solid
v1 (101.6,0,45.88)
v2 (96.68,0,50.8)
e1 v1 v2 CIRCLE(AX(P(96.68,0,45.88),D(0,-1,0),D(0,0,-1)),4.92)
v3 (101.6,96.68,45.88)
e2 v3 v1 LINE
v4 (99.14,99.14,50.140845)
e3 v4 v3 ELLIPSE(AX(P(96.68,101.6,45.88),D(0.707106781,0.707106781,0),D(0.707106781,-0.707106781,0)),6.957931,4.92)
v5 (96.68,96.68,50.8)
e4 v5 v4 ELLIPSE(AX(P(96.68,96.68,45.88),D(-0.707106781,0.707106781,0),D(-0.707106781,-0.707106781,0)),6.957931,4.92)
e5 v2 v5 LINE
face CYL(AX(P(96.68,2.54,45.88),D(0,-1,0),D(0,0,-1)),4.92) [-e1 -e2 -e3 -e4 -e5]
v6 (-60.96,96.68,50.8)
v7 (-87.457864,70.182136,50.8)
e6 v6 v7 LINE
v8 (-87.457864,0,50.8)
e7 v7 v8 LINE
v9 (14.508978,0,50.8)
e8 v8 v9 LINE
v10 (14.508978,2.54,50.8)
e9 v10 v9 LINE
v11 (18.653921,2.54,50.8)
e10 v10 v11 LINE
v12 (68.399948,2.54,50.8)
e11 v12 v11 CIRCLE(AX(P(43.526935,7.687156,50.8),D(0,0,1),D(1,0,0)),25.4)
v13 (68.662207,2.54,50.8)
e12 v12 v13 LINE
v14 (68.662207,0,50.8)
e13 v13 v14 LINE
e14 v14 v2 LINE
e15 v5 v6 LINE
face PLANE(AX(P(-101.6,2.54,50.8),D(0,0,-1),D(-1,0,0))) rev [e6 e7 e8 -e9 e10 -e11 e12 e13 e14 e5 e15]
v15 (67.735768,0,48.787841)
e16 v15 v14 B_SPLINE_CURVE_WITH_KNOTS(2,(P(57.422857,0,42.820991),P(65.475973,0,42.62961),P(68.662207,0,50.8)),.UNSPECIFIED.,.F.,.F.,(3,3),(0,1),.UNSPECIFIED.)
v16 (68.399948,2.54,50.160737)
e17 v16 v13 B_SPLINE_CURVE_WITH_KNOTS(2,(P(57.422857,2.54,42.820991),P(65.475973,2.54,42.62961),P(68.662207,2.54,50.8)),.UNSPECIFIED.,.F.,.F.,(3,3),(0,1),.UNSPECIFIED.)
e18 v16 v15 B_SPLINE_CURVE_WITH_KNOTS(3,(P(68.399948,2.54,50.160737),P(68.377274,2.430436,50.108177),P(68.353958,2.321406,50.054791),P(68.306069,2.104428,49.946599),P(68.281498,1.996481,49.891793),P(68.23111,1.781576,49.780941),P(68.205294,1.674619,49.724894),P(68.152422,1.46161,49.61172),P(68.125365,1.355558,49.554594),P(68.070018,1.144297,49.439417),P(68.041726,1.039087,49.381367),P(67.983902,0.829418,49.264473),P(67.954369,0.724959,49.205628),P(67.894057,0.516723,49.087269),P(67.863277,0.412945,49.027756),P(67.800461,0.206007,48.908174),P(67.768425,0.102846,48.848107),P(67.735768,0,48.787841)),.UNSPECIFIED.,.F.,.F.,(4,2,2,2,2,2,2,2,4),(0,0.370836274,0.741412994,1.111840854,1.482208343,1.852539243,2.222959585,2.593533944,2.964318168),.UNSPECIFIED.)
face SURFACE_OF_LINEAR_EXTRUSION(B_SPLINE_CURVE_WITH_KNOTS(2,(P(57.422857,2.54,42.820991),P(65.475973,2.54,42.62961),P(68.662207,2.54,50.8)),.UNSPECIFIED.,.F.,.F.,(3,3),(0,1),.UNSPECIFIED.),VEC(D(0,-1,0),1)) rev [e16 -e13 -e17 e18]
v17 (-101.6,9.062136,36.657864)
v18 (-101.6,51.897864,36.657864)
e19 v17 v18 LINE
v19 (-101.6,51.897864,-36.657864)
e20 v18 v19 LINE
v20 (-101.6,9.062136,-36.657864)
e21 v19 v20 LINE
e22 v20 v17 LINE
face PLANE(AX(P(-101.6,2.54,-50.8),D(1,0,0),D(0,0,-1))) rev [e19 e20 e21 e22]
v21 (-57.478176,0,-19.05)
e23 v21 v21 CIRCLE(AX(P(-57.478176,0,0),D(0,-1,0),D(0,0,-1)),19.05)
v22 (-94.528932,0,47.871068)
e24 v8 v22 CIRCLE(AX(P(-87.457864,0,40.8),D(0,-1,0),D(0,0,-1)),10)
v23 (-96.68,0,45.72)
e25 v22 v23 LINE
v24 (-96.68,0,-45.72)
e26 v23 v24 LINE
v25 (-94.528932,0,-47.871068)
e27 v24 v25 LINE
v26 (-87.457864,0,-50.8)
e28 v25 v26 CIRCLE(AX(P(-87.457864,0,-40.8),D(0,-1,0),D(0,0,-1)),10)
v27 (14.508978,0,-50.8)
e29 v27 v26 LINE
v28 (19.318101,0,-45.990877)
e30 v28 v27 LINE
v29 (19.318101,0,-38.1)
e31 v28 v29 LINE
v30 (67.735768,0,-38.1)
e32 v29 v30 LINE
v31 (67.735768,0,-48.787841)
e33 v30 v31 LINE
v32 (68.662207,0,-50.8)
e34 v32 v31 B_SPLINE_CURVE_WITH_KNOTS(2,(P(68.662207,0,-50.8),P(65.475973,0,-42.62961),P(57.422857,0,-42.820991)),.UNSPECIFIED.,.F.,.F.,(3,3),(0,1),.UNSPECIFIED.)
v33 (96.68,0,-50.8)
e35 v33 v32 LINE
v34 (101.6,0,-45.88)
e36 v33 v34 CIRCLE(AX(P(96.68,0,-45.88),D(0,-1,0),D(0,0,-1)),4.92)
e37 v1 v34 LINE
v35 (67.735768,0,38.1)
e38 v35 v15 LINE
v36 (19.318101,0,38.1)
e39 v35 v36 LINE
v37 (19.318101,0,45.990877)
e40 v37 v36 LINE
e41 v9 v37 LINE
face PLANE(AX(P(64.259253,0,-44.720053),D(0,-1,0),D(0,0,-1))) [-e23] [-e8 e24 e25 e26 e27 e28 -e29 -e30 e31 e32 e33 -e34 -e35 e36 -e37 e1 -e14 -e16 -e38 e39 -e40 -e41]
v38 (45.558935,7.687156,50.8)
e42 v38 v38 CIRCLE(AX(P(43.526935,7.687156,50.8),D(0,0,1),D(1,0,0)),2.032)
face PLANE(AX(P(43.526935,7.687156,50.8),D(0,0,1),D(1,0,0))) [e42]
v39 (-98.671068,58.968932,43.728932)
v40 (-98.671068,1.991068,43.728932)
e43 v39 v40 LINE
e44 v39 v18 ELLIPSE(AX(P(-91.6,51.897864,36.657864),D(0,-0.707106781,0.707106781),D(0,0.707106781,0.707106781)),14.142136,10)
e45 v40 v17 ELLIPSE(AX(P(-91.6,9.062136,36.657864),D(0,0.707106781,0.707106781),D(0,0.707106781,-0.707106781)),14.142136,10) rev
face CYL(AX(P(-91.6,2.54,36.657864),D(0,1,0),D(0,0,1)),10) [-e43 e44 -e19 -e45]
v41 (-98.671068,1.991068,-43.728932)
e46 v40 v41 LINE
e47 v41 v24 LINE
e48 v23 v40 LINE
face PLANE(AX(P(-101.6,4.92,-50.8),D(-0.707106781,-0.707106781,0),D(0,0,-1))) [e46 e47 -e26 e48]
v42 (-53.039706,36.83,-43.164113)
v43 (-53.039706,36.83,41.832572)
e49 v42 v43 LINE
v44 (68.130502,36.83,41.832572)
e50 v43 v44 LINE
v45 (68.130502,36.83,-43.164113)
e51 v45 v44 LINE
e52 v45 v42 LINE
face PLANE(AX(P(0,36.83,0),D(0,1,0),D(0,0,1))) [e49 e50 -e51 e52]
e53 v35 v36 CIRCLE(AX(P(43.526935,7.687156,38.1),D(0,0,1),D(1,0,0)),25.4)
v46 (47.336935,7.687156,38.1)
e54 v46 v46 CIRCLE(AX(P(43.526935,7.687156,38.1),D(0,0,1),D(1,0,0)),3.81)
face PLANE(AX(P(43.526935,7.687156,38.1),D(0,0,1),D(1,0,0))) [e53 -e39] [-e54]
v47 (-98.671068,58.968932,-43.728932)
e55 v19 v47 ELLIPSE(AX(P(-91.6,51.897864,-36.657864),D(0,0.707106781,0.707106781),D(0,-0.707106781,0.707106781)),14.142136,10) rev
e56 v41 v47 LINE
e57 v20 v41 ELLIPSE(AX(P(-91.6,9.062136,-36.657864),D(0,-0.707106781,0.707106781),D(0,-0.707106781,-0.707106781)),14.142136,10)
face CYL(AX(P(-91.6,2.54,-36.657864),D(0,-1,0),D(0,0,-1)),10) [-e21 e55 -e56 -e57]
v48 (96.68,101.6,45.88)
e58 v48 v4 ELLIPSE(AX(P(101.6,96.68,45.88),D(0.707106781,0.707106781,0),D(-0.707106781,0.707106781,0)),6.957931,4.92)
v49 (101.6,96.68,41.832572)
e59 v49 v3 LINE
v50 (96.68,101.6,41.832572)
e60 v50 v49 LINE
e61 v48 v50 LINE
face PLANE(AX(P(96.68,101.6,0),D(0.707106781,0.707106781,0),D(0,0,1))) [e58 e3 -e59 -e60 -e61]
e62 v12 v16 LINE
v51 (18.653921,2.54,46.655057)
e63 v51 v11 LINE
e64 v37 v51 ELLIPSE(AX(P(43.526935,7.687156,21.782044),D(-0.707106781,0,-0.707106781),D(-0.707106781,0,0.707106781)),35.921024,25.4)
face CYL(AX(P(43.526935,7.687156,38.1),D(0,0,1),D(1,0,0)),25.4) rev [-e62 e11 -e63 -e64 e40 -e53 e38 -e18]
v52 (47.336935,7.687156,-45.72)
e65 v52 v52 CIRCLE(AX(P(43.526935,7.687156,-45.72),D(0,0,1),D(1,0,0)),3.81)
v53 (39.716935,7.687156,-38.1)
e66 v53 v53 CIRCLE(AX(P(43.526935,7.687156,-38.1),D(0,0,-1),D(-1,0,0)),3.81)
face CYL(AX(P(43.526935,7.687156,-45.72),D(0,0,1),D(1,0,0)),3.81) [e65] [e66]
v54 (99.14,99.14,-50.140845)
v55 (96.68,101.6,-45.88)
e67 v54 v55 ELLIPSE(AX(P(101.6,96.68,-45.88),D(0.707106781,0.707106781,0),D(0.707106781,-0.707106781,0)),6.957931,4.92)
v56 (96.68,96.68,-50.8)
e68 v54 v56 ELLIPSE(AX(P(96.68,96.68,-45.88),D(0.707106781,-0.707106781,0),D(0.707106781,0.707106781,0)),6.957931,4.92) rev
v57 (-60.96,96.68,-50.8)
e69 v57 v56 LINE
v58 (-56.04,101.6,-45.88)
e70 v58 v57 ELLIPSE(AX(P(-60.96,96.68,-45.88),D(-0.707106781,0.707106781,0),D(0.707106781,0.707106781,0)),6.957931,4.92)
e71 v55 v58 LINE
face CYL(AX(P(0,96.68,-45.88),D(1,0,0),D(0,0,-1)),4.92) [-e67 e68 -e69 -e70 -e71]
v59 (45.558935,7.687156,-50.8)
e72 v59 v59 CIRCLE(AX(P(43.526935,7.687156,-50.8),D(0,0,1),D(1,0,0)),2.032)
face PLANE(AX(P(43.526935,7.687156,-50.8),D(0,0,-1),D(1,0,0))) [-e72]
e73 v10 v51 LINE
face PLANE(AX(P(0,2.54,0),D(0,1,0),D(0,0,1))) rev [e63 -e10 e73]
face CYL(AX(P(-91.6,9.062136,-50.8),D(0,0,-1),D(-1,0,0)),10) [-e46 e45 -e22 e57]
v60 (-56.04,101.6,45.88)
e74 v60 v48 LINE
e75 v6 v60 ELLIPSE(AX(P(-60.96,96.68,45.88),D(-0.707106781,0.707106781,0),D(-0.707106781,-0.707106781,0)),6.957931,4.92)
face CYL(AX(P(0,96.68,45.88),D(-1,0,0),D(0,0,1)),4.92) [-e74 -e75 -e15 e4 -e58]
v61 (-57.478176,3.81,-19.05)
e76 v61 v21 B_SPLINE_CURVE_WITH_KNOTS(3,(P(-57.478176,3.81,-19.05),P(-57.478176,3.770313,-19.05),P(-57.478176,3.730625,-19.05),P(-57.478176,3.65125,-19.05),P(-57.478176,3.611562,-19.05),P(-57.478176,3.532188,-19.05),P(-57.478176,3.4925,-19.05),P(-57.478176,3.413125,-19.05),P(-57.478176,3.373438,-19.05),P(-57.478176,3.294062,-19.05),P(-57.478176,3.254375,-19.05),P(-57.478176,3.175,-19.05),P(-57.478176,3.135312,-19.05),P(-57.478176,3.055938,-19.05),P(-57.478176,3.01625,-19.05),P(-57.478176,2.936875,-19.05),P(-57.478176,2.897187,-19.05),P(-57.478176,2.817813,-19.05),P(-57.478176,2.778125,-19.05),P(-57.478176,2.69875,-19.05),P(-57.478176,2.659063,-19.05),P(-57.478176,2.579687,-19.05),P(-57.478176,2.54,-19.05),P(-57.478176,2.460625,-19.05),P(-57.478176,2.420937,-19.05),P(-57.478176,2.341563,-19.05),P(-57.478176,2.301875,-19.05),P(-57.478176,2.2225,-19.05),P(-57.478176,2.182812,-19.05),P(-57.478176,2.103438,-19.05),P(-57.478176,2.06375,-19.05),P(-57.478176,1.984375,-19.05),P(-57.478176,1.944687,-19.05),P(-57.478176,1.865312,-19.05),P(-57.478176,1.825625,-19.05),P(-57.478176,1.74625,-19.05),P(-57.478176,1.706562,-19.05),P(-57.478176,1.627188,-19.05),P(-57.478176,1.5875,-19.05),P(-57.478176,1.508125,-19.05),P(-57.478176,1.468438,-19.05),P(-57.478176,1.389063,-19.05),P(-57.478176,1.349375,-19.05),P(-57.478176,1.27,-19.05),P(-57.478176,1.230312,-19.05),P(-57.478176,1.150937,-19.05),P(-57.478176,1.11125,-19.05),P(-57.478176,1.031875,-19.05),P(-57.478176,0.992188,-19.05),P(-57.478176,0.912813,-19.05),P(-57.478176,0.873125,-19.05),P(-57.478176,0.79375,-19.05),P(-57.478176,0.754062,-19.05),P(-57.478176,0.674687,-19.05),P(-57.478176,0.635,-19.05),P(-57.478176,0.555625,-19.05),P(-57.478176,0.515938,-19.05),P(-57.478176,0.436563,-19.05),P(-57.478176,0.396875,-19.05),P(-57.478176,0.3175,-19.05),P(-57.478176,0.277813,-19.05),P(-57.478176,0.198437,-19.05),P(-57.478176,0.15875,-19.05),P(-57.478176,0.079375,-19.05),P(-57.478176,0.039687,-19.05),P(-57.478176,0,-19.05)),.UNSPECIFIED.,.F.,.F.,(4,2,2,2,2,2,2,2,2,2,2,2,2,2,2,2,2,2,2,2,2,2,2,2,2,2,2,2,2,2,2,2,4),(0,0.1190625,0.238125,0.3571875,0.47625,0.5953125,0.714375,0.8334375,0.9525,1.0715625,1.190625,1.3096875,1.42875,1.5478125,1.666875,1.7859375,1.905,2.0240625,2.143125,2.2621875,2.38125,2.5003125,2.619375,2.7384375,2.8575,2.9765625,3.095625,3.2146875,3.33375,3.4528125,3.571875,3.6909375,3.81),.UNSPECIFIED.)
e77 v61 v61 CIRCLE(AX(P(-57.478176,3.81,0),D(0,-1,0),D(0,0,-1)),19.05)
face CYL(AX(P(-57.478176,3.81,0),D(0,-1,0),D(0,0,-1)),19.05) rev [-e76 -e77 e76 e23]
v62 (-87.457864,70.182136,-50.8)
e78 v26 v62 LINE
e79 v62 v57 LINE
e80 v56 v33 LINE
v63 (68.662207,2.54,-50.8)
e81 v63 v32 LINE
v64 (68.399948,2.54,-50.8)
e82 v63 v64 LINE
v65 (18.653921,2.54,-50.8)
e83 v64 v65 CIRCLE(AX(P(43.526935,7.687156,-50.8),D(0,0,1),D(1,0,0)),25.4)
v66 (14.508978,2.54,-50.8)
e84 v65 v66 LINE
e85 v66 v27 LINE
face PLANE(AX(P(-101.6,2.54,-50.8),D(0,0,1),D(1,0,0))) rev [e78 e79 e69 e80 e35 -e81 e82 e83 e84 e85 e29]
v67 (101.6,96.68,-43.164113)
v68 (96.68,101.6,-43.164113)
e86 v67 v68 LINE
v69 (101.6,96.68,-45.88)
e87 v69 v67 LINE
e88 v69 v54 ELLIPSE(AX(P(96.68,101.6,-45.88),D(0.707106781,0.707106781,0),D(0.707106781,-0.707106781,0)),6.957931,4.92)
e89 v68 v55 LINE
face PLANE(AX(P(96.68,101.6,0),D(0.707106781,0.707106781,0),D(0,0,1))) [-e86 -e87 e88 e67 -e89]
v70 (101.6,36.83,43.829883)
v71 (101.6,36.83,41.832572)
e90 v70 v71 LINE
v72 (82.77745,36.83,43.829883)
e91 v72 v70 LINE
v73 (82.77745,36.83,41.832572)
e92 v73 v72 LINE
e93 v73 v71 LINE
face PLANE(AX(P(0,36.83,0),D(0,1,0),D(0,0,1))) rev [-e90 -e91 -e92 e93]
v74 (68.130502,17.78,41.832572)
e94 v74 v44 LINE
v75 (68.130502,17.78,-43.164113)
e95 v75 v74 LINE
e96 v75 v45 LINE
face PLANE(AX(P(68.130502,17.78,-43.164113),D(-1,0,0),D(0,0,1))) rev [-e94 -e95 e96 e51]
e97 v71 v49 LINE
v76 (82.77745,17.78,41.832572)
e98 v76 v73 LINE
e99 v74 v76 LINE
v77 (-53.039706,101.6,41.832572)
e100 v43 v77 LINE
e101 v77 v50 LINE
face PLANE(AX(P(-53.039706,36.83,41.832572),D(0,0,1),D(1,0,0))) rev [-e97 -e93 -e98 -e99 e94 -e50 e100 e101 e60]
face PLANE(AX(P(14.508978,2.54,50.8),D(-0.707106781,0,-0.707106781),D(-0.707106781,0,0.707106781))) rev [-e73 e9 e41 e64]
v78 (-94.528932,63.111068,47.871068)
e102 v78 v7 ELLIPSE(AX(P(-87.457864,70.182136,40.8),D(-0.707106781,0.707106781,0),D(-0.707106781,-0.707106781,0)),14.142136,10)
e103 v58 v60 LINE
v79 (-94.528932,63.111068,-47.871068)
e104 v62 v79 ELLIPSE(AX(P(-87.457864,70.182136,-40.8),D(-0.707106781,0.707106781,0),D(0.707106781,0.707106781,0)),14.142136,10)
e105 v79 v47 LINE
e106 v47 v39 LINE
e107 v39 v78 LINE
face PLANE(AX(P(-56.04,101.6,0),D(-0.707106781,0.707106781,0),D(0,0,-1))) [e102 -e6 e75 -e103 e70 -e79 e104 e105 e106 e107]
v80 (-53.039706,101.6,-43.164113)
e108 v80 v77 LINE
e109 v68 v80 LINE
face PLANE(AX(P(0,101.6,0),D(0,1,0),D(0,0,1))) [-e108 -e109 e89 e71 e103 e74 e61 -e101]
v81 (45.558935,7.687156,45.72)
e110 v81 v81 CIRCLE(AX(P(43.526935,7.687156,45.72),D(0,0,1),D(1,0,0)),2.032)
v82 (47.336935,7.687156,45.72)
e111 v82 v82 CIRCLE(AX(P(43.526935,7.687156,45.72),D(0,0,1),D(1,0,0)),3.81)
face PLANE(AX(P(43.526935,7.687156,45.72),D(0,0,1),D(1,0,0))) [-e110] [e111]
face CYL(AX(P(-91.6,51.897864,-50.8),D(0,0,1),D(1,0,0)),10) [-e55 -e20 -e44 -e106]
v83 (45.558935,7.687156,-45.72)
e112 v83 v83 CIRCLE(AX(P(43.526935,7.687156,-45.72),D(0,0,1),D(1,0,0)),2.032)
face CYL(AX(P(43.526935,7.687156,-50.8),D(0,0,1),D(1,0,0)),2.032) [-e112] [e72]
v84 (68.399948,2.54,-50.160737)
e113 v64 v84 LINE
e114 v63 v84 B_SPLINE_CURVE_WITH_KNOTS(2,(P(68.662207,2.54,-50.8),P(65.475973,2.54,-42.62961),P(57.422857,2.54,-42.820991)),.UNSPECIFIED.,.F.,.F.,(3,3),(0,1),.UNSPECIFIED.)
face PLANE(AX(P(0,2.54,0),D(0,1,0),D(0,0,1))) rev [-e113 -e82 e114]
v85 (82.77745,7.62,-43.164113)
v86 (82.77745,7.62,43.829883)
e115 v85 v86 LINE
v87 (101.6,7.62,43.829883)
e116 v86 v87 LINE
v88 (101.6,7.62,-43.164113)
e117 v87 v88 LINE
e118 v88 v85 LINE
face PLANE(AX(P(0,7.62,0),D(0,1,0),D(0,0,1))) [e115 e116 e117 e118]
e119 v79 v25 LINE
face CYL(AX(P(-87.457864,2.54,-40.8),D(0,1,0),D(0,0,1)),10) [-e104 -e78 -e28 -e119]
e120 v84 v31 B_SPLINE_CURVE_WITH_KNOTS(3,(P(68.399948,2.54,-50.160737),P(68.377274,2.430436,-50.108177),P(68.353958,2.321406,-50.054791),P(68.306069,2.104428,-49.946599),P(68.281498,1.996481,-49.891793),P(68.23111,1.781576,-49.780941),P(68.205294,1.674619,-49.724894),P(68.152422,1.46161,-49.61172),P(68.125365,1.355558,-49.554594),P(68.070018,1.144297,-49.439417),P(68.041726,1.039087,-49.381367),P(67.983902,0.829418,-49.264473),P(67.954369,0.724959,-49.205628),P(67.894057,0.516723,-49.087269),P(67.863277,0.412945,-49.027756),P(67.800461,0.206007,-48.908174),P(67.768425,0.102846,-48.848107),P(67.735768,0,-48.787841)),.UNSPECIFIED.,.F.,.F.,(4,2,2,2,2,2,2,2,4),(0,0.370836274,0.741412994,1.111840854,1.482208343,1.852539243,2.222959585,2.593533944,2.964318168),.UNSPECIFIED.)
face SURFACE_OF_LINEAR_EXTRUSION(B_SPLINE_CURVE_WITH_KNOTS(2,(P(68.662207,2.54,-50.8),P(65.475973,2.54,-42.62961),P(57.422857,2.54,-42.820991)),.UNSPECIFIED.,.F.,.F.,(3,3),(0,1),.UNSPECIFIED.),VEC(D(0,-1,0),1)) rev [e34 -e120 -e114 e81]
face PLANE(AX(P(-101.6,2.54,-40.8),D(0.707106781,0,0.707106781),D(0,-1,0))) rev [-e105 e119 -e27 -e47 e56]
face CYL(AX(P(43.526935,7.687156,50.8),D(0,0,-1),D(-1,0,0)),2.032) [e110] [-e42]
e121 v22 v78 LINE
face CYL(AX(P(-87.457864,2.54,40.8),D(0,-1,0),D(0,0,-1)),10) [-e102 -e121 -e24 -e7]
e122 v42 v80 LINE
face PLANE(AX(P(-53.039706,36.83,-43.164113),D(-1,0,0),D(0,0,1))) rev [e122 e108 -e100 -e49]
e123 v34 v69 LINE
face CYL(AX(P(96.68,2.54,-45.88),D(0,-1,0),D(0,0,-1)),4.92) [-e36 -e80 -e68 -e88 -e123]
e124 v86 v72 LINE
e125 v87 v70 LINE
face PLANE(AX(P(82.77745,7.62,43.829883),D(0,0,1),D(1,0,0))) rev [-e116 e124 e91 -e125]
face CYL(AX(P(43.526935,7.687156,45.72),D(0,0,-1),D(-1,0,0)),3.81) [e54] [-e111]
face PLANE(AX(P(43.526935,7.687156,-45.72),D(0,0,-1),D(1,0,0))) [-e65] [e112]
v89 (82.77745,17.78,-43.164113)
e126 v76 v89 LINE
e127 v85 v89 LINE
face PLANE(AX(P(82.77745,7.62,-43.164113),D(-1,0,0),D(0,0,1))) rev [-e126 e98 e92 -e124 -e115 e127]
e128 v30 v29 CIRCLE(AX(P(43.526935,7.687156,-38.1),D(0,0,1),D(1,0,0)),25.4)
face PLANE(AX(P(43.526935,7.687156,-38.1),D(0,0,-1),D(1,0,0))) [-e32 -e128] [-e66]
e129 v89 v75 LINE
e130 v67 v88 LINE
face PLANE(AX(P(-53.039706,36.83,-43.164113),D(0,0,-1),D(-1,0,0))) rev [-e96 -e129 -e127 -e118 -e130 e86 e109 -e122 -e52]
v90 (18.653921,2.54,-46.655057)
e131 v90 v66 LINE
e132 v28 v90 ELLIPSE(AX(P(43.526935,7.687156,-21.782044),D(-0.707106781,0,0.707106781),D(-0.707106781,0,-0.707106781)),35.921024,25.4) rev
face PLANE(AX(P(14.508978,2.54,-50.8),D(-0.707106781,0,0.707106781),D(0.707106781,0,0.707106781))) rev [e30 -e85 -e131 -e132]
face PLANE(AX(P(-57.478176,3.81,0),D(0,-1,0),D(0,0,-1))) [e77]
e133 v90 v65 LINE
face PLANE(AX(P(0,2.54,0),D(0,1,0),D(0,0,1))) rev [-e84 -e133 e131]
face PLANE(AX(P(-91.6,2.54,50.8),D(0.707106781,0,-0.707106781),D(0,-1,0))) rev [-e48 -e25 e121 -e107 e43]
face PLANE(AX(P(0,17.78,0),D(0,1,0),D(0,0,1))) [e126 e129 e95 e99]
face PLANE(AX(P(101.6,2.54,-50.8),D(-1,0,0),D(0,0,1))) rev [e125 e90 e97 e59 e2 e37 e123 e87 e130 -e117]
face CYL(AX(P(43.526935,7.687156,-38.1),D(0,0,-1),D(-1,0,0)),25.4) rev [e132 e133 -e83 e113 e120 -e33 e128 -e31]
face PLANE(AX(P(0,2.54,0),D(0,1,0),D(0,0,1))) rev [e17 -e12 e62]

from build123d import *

# Parameters (mm, degrees)
BOSS_EXTRUDE1_DEPTH = 2.54
SKETCH2_W           = 203.2
SKETCH2_H           = 101.6
BOSS_EXTRUDE2_DEPTH = 99.06
CHAMFER2_SIZE       = 45.56
CHAMFER3_SIZE       = 4.92
CHAMFER4_SIZE       = 4.92
FILLET1_R           = 4.92
FILLET3_R           = 4.92
CHAMFER5_SIZE       = 10
FILLET4_R           = 10
SKETCH4_R           = 25.4
CUT_EXTRUDE1_DEPTH  = 12.7
SKETCH5_R           = 3.81
BOSS_EXTRUDE3_DEPTH = 7.62
SKETCH7_R           = 2.032
BOSS_EXTRUDE4_DEPTH = 5.08
SKETCH8_R           = 19.05
CUT_EXTRUDE2_DEPTH  = 3.81
SKETCH9_W           = 185.084164058
SKETCH9_H           = 84.996684453
CUT_EXTRUDE3_DEPTH  = 64.77
SKETCH10_W          = 37.50506442
SKETCH10_H          = 86.993995576
CUT_EXTRUDE4_DEPTH  = 29.21
SKETCH11_W          = 25.743121139
SKETCH11_H          = 84.996684453
CUT_EXTRUDE5_DEPTH  = 19.05


with BuildPart() as part:
    # Sketch1 → Boss-Extrude1 (new body)
    with BuildSketch(Plane(origin=(0, 0, 0), x_dir=(1, 0, 0), z_dir=(0, 1, 0))):
        with BuildLine():
            Line((14.508978226, 50.8), (22.487986765, 42.820991461))
            Line((22.487986765, 42.820991461), (37.396380497, 42.820991461))
            Line((37.396380497, 42.820991461), (37.396380497, 38.724667236))
            Line((37.396380497, 38.724667236), (49.657488857, 38.724667236))
            Line((49.657488857, 38.724667236), (49.657488857, 42.820991461))
            Line((49.657488857, 42.820991461), (57.422857485, 42.820991461))
            add(Edge.make_bspline(
                [(57.422857485, 42.820991461), (65.475972879, 42.629610348), (68.662206814, 50.8)],
                knots=[0, 0, 0, 1, 1, 1], degree=2))
            Line((68.662206814, 50.8), (101.6, 50.8))
            Line((101.6, 50.8), (101.6, -50.8))
            Line((101.6, -50.8), (68.662206814, -50.8))
            add(Edge.make_bspline(
                [(57.422857485, -42.820991461), (65.475972879, -42.629610348), (68.662206814, -50.8)],
                knots=[0, 0, 0, 1, 1, 1], degree=2))
            Line((57.422857485, -42.820991461), (49.657488857, -42.820991461))
            Line((49.657488857, -42.820991461), (49.657488857, -38.724667236))
            Line((49.657488857, -38.724667236), (37.396380497, -38.724667236))
            Line((37.396380497, -38.724667236), (37.396380497, -42.820991461))
            Line((37.396380497, -42.820991461), (22.487986765, -42.820991461))
            Line((22.487986765, -42.820991461), (14.508978226, -50.8))
            Line((14.508978226, -50.8), (-101.6, -50.8))
            Line((-101.6, -50.8), (-101.6, 50.8))
            Line((-101.6, 50.8), (14.508978226, 50.8))
        make_face()
    extrude(amount=BOSS_EXTRUDE1_DEPTH)

    # Sketch2 → Boss-Extrude2 (add)
    with BuildSketch(Plane(origin=(0, 2.54, 0), x_dir=(1, 0, 0), z_dir=(0, 1, 0))):
        Rectangle(SKETCH2_W, SKETCH2_H)
    extrude(amount=BOSS_EXTRUDE2_DEPTH)

    # Chamfer2
    chamfer2_edges = [part.edges().sort_by_distance(p)[0] for p in [
        (-101.6, 101.6, 0),
    ]]
    chamfer(chamfer2_edges, length=CHAMFER2_SIZE)

    # Chamfer3
    chamfer3_edges = [part.edges().sort_by_distance(p)[0] for p in [
        (101.6, 101.6, 0),
    ]]
    chamfer(chamfer3_edges, length=CHAMFER3_SIZE)

    # Chamfer4
    chamfer4_edges = [part.edges().sort_by_distance(p)[0] for p in [
        (-101.6, 0, 0),
    ]]
    chamfer(chamfer4_edges, length=CHAMFER4_SIZE)

    # Fillet1
    fillet1_edges = [part.edges().sort_by_distance(p)[0] for p in [
        (20.32, 101.6, -50.8),
        (20.32, 101.6, 50.8),
    ]]
    fillet(fillet1_edges, radius=FILLET1_R)

    # Fillet3
    fillet3_edges = [part.edges().sort_by_distance(p)[0] for p in [
        (101.6, 48.34, 50.8),
        (101.6, 48.34, -50.8),
    ]]
    fillet(fillet3_edges, radius=FILLET3_R - 0.0001)  # a hair under: the kernel refuses the full size

    # Chamfer5
    chamfer5_edges = [part.edges().sort_by_distance(p)[0] for p in [
        (-101.6, 30.48, -50.8),
        (-101.6, 30.48, 50.8),
    ]]
    chamfer(chamfer5_edges, length=CHAMFER5_SIZE)

    # Fillet4
    fillet4_edges = [part.edges().sort_by_distance(p)[0] for p in [
        (-101.6, 4.92, 0),
        (-101.6, 56.04, 0),
        (-101.6, 30.48, 40.8),
        (-101.6, 30.48, -40.8),
        (-91.6, 33.02, -50.8),
        (-91.6, 33.02, 50.8),
    ]]
    fillet(fillet4_edges, radius=FILLET4_R)

    # Sketch4 → Cut-Extrude1 (cut)
    with BuildSketch(Plane.XY.offset(50.8)):
        with Locations((43.526934677, 7.68715588)):
            Circle(SKETCH4_R)
    cut_extrude1 = extrude(amount=-CUT_EXTRUDE1_DEPTH, mode=Mode.SUBTRACT)

    # Mirror1: Cut-Extrude1 across plane
    add(cut_extrude1.mirror(Plane.XY), mode=Mode.SUBTRACT)

    # Sketch5 → Boss-Extrude3 (add)
    with BuildSketch(Plane.XY.offset(38.1)):
        with Locations((43.526934677, 7.68715588)):
            Circle(SKETCH5_R)
    boss_extrude3 = extrude(amount=BOSS_EXTRUDE3_DEPTH)

    # Mirror2: Boss-Extrude3 across plane
    add(boss_extrude3.mirror(Plane.XY))

    # Sketch7 → Boss-Extrude4 (add)
    with BuildSketch(Plane.XY.offset(45.72)):
        with Locations((43.526934677, 7.68715588)):
            Circle(SKETCH7_R)
    boss_extrude4 = extrude(amount=BOSS_EXTRUDE4_DEPTH)

    # Mirror3: Boss-Extrude4 across plane
    add(boss_extrude4.mirror(Plane.XY))

    # Sketch8 → Cut-Extrude2 (cut)
    with BuildSketch(Plane.XZ):
        with Locations(Location((-57.478175649, 0, 0), (0, 0, 270))):
            Circle(SKETCH8_R)
    extrude(amount=-CUT_EXTRUDE2_DEPTH, mode=Mode.SUBTRACT)

    # Sketch9 → Cut-Extrude3 (cut)
    with BuildSketch(Plane(origin=(0, 101.6, 0), x_dir=(1, 0, 0), z_dir=(0, 1, 0))):
        with Locations((39.502375542, 0.665770374)):
            Rectangle(SKETCH9_W, SKETCH9_H)
    extrude(amount=-CUT_EXTRUDE3_DEPTH, mode=Mode.SUBTRACT)

    # Sketch10 → Cut-Extrude4 (cut)
    with BuildSketch(Plane(origin=(0, 36.83, 0), x_dir=(1, 0, 0), z_dir=(0, 1, 0))):
        with Locations((101.529982082, -0.332885187)):
            Rectangle(SKETCH10_W, SKETCH10_H)
    extrude(amount=-CUT_EXTRUDE4_DEPTH, mode=Mode.SUBTRACT)

    # Sketch11 → Cut-Extrude5 (cut)
    with BuildSketch(Plane(origin=(0, 36.83, 0), x_dir=(1, 0, 0), z_dir=(0, 1, 0))):
        with Locations((81.002062208, 0.665770374)):
            Rectangle(SKETCH11_W, SKETCH11_H)
    extrude(amount=-CUT_EXTRUDE5_DEPTH, mode=Mode.SUBTRACT)


solid = part.part
